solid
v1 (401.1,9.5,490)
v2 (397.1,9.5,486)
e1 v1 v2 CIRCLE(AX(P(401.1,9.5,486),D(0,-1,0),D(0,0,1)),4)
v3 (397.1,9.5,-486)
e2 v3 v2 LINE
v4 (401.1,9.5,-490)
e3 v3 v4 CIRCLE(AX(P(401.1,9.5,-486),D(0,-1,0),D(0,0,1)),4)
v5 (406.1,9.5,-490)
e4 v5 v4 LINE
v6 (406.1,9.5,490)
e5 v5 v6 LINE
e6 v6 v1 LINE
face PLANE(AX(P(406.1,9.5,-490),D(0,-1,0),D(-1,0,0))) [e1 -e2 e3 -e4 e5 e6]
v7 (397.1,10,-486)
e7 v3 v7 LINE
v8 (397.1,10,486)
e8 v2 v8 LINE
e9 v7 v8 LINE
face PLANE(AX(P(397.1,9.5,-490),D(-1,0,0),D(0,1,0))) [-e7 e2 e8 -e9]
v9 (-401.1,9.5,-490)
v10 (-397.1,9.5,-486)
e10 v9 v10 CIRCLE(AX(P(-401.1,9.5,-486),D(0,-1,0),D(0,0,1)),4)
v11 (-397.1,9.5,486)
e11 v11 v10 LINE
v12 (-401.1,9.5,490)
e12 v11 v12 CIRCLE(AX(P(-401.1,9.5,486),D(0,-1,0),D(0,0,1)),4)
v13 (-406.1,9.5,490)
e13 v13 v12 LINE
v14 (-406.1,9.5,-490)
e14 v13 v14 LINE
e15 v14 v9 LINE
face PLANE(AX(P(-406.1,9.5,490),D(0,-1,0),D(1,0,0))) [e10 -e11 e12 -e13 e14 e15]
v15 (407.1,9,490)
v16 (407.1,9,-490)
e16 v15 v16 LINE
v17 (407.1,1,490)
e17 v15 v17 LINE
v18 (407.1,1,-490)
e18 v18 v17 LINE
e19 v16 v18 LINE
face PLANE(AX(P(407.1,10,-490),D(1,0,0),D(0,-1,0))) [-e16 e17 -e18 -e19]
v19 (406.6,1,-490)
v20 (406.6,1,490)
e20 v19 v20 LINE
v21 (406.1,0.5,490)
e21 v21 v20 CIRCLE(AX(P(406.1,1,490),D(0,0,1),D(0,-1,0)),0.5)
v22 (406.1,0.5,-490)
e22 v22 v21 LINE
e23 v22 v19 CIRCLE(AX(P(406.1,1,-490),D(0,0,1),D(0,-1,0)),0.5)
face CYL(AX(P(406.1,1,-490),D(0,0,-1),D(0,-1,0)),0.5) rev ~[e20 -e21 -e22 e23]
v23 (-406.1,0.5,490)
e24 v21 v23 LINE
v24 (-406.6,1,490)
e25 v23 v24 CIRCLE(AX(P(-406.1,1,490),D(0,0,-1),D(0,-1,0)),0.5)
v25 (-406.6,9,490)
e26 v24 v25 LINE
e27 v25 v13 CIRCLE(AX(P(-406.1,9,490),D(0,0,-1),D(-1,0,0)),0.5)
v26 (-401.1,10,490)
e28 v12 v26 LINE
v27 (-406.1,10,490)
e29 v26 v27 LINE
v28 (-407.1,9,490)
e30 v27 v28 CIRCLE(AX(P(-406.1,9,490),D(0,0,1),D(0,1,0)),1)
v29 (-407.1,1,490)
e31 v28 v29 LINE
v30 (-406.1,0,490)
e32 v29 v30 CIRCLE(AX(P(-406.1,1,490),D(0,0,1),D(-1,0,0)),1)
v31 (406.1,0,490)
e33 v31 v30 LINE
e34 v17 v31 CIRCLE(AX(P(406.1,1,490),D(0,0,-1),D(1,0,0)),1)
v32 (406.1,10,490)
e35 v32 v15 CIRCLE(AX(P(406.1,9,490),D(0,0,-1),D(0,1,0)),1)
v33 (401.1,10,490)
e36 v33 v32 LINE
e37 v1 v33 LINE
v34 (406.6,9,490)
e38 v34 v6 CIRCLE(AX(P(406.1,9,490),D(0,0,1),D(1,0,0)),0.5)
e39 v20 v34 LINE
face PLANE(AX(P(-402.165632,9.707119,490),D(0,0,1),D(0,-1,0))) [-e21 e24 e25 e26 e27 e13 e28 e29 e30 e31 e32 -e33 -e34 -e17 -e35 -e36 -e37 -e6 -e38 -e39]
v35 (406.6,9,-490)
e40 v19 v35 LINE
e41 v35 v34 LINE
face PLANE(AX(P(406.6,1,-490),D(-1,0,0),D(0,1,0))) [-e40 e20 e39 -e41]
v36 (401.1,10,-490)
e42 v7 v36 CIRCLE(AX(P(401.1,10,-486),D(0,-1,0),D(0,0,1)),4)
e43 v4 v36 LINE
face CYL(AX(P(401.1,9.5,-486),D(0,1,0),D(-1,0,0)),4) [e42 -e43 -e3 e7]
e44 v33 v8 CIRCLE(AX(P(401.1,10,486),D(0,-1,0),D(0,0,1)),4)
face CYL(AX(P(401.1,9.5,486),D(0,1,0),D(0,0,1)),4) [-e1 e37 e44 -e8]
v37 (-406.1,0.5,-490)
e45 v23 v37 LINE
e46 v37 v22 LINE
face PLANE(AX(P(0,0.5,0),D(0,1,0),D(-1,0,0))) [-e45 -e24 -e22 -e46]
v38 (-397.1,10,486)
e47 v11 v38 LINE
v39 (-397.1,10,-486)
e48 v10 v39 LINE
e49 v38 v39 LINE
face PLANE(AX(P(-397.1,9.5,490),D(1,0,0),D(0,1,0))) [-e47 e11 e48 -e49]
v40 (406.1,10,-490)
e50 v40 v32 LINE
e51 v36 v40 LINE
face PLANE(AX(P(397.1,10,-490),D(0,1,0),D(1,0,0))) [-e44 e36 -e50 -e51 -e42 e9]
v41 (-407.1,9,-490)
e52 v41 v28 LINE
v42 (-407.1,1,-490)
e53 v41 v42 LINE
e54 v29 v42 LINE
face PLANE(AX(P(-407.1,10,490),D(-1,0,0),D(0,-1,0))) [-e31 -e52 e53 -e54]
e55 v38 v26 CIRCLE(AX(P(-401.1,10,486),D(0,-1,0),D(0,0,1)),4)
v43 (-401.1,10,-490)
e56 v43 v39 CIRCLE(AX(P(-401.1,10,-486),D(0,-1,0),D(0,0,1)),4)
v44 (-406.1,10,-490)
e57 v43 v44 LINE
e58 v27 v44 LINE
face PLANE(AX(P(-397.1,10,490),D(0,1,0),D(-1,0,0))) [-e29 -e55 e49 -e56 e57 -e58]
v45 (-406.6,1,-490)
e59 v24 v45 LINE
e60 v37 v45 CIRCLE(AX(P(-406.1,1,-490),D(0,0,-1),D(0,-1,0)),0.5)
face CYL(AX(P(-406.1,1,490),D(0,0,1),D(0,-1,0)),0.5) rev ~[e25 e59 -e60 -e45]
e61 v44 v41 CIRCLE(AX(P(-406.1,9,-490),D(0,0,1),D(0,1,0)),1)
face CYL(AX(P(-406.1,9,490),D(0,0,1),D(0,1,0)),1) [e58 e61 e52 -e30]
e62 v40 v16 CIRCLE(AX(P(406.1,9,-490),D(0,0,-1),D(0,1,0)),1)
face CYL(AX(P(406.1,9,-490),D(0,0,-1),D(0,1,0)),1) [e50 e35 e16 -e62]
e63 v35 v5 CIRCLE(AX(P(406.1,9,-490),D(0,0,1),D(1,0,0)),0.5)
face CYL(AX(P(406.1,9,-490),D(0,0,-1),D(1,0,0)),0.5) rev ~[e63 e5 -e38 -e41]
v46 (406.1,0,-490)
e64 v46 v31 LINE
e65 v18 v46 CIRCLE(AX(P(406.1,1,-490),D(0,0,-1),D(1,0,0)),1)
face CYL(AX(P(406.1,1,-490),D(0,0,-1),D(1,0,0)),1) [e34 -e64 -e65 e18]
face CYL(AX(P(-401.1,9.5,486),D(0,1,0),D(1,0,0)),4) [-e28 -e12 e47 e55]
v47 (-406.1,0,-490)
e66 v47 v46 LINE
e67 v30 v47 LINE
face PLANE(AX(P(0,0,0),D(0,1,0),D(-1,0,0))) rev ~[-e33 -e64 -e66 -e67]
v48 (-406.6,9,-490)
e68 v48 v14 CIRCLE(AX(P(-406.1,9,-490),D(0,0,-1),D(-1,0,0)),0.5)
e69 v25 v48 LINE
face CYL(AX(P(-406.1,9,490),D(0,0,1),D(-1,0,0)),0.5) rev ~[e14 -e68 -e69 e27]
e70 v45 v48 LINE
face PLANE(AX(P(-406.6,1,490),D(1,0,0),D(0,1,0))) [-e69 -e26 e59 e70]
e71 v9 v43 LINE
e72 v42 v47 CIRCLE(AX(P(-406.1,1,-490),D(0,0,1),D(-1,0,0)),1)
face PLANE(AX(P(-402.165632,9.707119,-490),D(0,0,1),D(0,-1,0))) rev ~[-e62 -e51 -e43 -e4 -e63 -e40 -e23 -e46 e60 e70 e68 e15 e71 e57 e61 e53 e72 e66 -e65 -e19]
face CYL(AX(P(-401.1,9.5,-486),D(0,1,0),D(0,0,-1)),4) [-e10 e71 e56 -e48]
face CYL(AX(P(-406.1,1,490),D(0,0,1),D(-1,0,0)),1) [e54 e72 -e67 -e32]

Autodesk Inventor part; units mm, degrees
ref_plane "YZ Plane" through (0, 0, 0) normal (1, 0, 0) x (0, 1, 0)
ref_plane "XZ Plane" through (0, 0, 0) normal (0, 1, 0) x (-1, 0, 0)
ref_plane "XY Plane" through (0, 0, 0) normal (0, 0, 1) x (1, 0, 0)
sketch "Sketch6" plane through (0, 0, 0) normal (0, 1, 0) x (-1, 0, 0)
  line L0 (407.1, -490) -> (-407.1, -490)
  line L1 (-407.1, -490) -> (-407.1, 490)
  line L2 (-407.1, 490) -> (407.1, 490)
  line L3 (407.1, 490) -> (407.1, -490)
  line L4 (407.1, -490) -> (-407.1, 490) construction
  line L5 (-407.1, -490) -> (407.1, 490) construction
  point P0 (0, 0)
  dimension "d52" = 814.2
  dimension "d53" = 980
extrude "Plate2" add sketch "Sketch6" along normal blind 0.5
sketch "Sketch11" plane through (406.6, 0, -490) normal (1, 0, 0) x (0, 1, 0)
  line L0 (0, 980) -> (0, 0)
  line L1 (0, 0) -> (10, 0)
  line L2 (10, 0) -> (10, 980)
  line L3 (10, 980) -> (0, 980)
edge flange "Flange2" height 10 angle 90 thickness 0.5 bend radius 0.5 thickness toward (1, 0, 0) relief tear relief width 0.5 relief depth 0.25 edges at (407.1, 0.5, 0) wall of the first edge with corners at (406.6, 0, 490) (406.6, 0, -490) (406.6, 10, -490) (406.6, 10, 490)
bend "Bend3"
corner "Corner3"
sketch "Sketch12" plane through (407.1, 9.5, -490) normal (0, 1, 0) x (-1, 0, 0)
  line L0 (0, 980) -> (0, 0)
  line L1 (0, 0) -> (10, 0)
  line L2 (10, 0) -> (10, 980)
  line L3 (10, 980) -> (0, 980)
edge flange "Flange3" height 10 angle 90 thickness 0.5 bend radius 0.5 thickness toward (0, 1, 0) relief tear relief width 0.5 relief depth 0.25 edges at (406.6, 10, 0) wall of the first edge with corners at (407.1, 9.5, 490) (407.1, 9.5, -490) (397.1, 9.5, -490) (397.1, 9.5, 490)
bend "Bend4"
corner "Corner4"
sketch "Sketch13" plane through (-406.6, 0, 490) normal (-1, 0, 0) x (0, -1, 0)
  line L0 (0, -980) -> (0, 0)
  line L1 (0, 0) -> (-10, 0)
  line L2 (-10, 0) -> (-10, -980)
  line L3 (-10, -980) -> (0, -980)
edge flange "Flange4" height 10 angle 90 thickness 0.5 bend radius 0.5 thickness toward (-1, 0, 0) relief tear relief width 0.5 relief depth 0.25 edges at (-407.1, 0.5, 0) wall of the first edge with corners at (-406.6, 0, -490) (-406.6, 0, 490) (-406.6, 10, 490) (-406.6, 10, -490)
bend "Bend5"
corner "Corner5"
sketch "Sketch14" plane through (-407.1, 9.5, 490) normal (0, 1, 0) x (-1, 0, 0)
  line L0 (0, -980) -> (0, 0)
  line L1 (0, 0) -> (-10, 0)
  line L2 (-10, 0) -> (-10, -980)
  line L3 (-10, -980) -> (0, -980)
edge flange "Flange5" height 10 angle 90 thickness 0.5 bend radius 0.5 thickness toward (0, 1, 0) relief tear relief width 0.5 relief depth 0.25 edges at (-406.6, 10, 0) wall of the first edge with corners at (-407.1, 9.5, -490) (-407.1, 9.5, 490) (-397.1, 9.5, 490) (-397.1, 9.5, -490)
bend "Bend6"
corner "Corner6"
fillet "Corner Round1" radius 4 1 edges at (397.1, 9.75, 490)
fillet "Corner Round2" radius 4 1 edges at (397.1, 9.75, -490)
fillet "Corner Round3" radius 4 1 edges at (-397.1, 9.75, -490)
fillet "Corner Round4" radius 4 1 edges at (-397.1, 9.75, 490)
equation "\"d52\" = ЖАБРЫ_базовая_ширина - ЖАБРЫ_шаг_листов"
equation "\"d53\" = ЖАБРЫ_базовая_длина_кор_лист"
equation "\"d54\" = Thickness"
equation "\"d84\" = BendReliefWidth"
equation "\"d85\" = BendReliefDepth"
equation "\"d86\" = MinimumRemnant"
equation "\"d87\" = TransitionRadius"
equation "\"d90\" = BendRadius"
equation "\"d91\" = CornerReliefSize"
equation "\"d92\" = GapSize"
equation "\"d93\" = JacobiRadiusSize"
equation "\"d94\" = BendReliefWidth"
equation "\"d95\" = BendReliefDepth"
equation "\"d96\" = MinimumRemnant"
equation "\"d97\" = TransitionRadius"
equation "\"d100\" = BendRadius"
equation "\"d101\" = CornerReliefSize"
equation "\"d102\" = GapSize"
equation "\"d103\" = JacobiRadiusSize"
equation "\"d104\" = BendReliefWidth"
equation "\"d105\" = BendReliefDepth"
equation "\"d106\" = MinimumRemnant"
equation "\"d107\" = TransitionRadius"
equation "\"d110\" = BendRadius"
equation "\"d111\" = CornerReliefSize"
equation "\"d112\" = GapSize"
equation "\"d113\" = JacobiRadiusSize"
equation "\"d114\" = BendReliefWidth"
equation "\"d115\" = BendReliefDepth"
equation "\"d116\" = MinimumRemnant"
equation "\"d117\" = TransitionRadius"
equation "\"d120\" = BendRadius"
equation "\"d121\" = CornerReliefSize"
equation "\"d122\" = GapSize"
equation "\"d123\" = JacobiRadiusSize"
equation "\"BendRadius\" = Thickness"
equation "\"BendReliefWidth\" = Thickness"
equation "\"BendReliefDepth\" = 0.5 * Thickness"
equation "\"CornerReliefSize\" = 4 * Thickness"
equation "\"MinimumRemnant\" = 2 * Thickness"
equation "\"TransitionRadius\" = BendRadius"
equation "\"JacobiRadiusSize\" = BendRadius"
equation "\"GapSize\" = Thickness"
equation "\"ЖАБРЫ_базовая_ширина\" = 915"
equation "\"ЖАБРЫ_шаг_листов\" = 100.8"
equation "\"ЖАБРЫ_базовая_длина_кор_лист\" = 980"
equation "\"Thickness\" = 0.5"
properties part number "MSC 805 SHEET GILLS" material "Stainless Steel"
